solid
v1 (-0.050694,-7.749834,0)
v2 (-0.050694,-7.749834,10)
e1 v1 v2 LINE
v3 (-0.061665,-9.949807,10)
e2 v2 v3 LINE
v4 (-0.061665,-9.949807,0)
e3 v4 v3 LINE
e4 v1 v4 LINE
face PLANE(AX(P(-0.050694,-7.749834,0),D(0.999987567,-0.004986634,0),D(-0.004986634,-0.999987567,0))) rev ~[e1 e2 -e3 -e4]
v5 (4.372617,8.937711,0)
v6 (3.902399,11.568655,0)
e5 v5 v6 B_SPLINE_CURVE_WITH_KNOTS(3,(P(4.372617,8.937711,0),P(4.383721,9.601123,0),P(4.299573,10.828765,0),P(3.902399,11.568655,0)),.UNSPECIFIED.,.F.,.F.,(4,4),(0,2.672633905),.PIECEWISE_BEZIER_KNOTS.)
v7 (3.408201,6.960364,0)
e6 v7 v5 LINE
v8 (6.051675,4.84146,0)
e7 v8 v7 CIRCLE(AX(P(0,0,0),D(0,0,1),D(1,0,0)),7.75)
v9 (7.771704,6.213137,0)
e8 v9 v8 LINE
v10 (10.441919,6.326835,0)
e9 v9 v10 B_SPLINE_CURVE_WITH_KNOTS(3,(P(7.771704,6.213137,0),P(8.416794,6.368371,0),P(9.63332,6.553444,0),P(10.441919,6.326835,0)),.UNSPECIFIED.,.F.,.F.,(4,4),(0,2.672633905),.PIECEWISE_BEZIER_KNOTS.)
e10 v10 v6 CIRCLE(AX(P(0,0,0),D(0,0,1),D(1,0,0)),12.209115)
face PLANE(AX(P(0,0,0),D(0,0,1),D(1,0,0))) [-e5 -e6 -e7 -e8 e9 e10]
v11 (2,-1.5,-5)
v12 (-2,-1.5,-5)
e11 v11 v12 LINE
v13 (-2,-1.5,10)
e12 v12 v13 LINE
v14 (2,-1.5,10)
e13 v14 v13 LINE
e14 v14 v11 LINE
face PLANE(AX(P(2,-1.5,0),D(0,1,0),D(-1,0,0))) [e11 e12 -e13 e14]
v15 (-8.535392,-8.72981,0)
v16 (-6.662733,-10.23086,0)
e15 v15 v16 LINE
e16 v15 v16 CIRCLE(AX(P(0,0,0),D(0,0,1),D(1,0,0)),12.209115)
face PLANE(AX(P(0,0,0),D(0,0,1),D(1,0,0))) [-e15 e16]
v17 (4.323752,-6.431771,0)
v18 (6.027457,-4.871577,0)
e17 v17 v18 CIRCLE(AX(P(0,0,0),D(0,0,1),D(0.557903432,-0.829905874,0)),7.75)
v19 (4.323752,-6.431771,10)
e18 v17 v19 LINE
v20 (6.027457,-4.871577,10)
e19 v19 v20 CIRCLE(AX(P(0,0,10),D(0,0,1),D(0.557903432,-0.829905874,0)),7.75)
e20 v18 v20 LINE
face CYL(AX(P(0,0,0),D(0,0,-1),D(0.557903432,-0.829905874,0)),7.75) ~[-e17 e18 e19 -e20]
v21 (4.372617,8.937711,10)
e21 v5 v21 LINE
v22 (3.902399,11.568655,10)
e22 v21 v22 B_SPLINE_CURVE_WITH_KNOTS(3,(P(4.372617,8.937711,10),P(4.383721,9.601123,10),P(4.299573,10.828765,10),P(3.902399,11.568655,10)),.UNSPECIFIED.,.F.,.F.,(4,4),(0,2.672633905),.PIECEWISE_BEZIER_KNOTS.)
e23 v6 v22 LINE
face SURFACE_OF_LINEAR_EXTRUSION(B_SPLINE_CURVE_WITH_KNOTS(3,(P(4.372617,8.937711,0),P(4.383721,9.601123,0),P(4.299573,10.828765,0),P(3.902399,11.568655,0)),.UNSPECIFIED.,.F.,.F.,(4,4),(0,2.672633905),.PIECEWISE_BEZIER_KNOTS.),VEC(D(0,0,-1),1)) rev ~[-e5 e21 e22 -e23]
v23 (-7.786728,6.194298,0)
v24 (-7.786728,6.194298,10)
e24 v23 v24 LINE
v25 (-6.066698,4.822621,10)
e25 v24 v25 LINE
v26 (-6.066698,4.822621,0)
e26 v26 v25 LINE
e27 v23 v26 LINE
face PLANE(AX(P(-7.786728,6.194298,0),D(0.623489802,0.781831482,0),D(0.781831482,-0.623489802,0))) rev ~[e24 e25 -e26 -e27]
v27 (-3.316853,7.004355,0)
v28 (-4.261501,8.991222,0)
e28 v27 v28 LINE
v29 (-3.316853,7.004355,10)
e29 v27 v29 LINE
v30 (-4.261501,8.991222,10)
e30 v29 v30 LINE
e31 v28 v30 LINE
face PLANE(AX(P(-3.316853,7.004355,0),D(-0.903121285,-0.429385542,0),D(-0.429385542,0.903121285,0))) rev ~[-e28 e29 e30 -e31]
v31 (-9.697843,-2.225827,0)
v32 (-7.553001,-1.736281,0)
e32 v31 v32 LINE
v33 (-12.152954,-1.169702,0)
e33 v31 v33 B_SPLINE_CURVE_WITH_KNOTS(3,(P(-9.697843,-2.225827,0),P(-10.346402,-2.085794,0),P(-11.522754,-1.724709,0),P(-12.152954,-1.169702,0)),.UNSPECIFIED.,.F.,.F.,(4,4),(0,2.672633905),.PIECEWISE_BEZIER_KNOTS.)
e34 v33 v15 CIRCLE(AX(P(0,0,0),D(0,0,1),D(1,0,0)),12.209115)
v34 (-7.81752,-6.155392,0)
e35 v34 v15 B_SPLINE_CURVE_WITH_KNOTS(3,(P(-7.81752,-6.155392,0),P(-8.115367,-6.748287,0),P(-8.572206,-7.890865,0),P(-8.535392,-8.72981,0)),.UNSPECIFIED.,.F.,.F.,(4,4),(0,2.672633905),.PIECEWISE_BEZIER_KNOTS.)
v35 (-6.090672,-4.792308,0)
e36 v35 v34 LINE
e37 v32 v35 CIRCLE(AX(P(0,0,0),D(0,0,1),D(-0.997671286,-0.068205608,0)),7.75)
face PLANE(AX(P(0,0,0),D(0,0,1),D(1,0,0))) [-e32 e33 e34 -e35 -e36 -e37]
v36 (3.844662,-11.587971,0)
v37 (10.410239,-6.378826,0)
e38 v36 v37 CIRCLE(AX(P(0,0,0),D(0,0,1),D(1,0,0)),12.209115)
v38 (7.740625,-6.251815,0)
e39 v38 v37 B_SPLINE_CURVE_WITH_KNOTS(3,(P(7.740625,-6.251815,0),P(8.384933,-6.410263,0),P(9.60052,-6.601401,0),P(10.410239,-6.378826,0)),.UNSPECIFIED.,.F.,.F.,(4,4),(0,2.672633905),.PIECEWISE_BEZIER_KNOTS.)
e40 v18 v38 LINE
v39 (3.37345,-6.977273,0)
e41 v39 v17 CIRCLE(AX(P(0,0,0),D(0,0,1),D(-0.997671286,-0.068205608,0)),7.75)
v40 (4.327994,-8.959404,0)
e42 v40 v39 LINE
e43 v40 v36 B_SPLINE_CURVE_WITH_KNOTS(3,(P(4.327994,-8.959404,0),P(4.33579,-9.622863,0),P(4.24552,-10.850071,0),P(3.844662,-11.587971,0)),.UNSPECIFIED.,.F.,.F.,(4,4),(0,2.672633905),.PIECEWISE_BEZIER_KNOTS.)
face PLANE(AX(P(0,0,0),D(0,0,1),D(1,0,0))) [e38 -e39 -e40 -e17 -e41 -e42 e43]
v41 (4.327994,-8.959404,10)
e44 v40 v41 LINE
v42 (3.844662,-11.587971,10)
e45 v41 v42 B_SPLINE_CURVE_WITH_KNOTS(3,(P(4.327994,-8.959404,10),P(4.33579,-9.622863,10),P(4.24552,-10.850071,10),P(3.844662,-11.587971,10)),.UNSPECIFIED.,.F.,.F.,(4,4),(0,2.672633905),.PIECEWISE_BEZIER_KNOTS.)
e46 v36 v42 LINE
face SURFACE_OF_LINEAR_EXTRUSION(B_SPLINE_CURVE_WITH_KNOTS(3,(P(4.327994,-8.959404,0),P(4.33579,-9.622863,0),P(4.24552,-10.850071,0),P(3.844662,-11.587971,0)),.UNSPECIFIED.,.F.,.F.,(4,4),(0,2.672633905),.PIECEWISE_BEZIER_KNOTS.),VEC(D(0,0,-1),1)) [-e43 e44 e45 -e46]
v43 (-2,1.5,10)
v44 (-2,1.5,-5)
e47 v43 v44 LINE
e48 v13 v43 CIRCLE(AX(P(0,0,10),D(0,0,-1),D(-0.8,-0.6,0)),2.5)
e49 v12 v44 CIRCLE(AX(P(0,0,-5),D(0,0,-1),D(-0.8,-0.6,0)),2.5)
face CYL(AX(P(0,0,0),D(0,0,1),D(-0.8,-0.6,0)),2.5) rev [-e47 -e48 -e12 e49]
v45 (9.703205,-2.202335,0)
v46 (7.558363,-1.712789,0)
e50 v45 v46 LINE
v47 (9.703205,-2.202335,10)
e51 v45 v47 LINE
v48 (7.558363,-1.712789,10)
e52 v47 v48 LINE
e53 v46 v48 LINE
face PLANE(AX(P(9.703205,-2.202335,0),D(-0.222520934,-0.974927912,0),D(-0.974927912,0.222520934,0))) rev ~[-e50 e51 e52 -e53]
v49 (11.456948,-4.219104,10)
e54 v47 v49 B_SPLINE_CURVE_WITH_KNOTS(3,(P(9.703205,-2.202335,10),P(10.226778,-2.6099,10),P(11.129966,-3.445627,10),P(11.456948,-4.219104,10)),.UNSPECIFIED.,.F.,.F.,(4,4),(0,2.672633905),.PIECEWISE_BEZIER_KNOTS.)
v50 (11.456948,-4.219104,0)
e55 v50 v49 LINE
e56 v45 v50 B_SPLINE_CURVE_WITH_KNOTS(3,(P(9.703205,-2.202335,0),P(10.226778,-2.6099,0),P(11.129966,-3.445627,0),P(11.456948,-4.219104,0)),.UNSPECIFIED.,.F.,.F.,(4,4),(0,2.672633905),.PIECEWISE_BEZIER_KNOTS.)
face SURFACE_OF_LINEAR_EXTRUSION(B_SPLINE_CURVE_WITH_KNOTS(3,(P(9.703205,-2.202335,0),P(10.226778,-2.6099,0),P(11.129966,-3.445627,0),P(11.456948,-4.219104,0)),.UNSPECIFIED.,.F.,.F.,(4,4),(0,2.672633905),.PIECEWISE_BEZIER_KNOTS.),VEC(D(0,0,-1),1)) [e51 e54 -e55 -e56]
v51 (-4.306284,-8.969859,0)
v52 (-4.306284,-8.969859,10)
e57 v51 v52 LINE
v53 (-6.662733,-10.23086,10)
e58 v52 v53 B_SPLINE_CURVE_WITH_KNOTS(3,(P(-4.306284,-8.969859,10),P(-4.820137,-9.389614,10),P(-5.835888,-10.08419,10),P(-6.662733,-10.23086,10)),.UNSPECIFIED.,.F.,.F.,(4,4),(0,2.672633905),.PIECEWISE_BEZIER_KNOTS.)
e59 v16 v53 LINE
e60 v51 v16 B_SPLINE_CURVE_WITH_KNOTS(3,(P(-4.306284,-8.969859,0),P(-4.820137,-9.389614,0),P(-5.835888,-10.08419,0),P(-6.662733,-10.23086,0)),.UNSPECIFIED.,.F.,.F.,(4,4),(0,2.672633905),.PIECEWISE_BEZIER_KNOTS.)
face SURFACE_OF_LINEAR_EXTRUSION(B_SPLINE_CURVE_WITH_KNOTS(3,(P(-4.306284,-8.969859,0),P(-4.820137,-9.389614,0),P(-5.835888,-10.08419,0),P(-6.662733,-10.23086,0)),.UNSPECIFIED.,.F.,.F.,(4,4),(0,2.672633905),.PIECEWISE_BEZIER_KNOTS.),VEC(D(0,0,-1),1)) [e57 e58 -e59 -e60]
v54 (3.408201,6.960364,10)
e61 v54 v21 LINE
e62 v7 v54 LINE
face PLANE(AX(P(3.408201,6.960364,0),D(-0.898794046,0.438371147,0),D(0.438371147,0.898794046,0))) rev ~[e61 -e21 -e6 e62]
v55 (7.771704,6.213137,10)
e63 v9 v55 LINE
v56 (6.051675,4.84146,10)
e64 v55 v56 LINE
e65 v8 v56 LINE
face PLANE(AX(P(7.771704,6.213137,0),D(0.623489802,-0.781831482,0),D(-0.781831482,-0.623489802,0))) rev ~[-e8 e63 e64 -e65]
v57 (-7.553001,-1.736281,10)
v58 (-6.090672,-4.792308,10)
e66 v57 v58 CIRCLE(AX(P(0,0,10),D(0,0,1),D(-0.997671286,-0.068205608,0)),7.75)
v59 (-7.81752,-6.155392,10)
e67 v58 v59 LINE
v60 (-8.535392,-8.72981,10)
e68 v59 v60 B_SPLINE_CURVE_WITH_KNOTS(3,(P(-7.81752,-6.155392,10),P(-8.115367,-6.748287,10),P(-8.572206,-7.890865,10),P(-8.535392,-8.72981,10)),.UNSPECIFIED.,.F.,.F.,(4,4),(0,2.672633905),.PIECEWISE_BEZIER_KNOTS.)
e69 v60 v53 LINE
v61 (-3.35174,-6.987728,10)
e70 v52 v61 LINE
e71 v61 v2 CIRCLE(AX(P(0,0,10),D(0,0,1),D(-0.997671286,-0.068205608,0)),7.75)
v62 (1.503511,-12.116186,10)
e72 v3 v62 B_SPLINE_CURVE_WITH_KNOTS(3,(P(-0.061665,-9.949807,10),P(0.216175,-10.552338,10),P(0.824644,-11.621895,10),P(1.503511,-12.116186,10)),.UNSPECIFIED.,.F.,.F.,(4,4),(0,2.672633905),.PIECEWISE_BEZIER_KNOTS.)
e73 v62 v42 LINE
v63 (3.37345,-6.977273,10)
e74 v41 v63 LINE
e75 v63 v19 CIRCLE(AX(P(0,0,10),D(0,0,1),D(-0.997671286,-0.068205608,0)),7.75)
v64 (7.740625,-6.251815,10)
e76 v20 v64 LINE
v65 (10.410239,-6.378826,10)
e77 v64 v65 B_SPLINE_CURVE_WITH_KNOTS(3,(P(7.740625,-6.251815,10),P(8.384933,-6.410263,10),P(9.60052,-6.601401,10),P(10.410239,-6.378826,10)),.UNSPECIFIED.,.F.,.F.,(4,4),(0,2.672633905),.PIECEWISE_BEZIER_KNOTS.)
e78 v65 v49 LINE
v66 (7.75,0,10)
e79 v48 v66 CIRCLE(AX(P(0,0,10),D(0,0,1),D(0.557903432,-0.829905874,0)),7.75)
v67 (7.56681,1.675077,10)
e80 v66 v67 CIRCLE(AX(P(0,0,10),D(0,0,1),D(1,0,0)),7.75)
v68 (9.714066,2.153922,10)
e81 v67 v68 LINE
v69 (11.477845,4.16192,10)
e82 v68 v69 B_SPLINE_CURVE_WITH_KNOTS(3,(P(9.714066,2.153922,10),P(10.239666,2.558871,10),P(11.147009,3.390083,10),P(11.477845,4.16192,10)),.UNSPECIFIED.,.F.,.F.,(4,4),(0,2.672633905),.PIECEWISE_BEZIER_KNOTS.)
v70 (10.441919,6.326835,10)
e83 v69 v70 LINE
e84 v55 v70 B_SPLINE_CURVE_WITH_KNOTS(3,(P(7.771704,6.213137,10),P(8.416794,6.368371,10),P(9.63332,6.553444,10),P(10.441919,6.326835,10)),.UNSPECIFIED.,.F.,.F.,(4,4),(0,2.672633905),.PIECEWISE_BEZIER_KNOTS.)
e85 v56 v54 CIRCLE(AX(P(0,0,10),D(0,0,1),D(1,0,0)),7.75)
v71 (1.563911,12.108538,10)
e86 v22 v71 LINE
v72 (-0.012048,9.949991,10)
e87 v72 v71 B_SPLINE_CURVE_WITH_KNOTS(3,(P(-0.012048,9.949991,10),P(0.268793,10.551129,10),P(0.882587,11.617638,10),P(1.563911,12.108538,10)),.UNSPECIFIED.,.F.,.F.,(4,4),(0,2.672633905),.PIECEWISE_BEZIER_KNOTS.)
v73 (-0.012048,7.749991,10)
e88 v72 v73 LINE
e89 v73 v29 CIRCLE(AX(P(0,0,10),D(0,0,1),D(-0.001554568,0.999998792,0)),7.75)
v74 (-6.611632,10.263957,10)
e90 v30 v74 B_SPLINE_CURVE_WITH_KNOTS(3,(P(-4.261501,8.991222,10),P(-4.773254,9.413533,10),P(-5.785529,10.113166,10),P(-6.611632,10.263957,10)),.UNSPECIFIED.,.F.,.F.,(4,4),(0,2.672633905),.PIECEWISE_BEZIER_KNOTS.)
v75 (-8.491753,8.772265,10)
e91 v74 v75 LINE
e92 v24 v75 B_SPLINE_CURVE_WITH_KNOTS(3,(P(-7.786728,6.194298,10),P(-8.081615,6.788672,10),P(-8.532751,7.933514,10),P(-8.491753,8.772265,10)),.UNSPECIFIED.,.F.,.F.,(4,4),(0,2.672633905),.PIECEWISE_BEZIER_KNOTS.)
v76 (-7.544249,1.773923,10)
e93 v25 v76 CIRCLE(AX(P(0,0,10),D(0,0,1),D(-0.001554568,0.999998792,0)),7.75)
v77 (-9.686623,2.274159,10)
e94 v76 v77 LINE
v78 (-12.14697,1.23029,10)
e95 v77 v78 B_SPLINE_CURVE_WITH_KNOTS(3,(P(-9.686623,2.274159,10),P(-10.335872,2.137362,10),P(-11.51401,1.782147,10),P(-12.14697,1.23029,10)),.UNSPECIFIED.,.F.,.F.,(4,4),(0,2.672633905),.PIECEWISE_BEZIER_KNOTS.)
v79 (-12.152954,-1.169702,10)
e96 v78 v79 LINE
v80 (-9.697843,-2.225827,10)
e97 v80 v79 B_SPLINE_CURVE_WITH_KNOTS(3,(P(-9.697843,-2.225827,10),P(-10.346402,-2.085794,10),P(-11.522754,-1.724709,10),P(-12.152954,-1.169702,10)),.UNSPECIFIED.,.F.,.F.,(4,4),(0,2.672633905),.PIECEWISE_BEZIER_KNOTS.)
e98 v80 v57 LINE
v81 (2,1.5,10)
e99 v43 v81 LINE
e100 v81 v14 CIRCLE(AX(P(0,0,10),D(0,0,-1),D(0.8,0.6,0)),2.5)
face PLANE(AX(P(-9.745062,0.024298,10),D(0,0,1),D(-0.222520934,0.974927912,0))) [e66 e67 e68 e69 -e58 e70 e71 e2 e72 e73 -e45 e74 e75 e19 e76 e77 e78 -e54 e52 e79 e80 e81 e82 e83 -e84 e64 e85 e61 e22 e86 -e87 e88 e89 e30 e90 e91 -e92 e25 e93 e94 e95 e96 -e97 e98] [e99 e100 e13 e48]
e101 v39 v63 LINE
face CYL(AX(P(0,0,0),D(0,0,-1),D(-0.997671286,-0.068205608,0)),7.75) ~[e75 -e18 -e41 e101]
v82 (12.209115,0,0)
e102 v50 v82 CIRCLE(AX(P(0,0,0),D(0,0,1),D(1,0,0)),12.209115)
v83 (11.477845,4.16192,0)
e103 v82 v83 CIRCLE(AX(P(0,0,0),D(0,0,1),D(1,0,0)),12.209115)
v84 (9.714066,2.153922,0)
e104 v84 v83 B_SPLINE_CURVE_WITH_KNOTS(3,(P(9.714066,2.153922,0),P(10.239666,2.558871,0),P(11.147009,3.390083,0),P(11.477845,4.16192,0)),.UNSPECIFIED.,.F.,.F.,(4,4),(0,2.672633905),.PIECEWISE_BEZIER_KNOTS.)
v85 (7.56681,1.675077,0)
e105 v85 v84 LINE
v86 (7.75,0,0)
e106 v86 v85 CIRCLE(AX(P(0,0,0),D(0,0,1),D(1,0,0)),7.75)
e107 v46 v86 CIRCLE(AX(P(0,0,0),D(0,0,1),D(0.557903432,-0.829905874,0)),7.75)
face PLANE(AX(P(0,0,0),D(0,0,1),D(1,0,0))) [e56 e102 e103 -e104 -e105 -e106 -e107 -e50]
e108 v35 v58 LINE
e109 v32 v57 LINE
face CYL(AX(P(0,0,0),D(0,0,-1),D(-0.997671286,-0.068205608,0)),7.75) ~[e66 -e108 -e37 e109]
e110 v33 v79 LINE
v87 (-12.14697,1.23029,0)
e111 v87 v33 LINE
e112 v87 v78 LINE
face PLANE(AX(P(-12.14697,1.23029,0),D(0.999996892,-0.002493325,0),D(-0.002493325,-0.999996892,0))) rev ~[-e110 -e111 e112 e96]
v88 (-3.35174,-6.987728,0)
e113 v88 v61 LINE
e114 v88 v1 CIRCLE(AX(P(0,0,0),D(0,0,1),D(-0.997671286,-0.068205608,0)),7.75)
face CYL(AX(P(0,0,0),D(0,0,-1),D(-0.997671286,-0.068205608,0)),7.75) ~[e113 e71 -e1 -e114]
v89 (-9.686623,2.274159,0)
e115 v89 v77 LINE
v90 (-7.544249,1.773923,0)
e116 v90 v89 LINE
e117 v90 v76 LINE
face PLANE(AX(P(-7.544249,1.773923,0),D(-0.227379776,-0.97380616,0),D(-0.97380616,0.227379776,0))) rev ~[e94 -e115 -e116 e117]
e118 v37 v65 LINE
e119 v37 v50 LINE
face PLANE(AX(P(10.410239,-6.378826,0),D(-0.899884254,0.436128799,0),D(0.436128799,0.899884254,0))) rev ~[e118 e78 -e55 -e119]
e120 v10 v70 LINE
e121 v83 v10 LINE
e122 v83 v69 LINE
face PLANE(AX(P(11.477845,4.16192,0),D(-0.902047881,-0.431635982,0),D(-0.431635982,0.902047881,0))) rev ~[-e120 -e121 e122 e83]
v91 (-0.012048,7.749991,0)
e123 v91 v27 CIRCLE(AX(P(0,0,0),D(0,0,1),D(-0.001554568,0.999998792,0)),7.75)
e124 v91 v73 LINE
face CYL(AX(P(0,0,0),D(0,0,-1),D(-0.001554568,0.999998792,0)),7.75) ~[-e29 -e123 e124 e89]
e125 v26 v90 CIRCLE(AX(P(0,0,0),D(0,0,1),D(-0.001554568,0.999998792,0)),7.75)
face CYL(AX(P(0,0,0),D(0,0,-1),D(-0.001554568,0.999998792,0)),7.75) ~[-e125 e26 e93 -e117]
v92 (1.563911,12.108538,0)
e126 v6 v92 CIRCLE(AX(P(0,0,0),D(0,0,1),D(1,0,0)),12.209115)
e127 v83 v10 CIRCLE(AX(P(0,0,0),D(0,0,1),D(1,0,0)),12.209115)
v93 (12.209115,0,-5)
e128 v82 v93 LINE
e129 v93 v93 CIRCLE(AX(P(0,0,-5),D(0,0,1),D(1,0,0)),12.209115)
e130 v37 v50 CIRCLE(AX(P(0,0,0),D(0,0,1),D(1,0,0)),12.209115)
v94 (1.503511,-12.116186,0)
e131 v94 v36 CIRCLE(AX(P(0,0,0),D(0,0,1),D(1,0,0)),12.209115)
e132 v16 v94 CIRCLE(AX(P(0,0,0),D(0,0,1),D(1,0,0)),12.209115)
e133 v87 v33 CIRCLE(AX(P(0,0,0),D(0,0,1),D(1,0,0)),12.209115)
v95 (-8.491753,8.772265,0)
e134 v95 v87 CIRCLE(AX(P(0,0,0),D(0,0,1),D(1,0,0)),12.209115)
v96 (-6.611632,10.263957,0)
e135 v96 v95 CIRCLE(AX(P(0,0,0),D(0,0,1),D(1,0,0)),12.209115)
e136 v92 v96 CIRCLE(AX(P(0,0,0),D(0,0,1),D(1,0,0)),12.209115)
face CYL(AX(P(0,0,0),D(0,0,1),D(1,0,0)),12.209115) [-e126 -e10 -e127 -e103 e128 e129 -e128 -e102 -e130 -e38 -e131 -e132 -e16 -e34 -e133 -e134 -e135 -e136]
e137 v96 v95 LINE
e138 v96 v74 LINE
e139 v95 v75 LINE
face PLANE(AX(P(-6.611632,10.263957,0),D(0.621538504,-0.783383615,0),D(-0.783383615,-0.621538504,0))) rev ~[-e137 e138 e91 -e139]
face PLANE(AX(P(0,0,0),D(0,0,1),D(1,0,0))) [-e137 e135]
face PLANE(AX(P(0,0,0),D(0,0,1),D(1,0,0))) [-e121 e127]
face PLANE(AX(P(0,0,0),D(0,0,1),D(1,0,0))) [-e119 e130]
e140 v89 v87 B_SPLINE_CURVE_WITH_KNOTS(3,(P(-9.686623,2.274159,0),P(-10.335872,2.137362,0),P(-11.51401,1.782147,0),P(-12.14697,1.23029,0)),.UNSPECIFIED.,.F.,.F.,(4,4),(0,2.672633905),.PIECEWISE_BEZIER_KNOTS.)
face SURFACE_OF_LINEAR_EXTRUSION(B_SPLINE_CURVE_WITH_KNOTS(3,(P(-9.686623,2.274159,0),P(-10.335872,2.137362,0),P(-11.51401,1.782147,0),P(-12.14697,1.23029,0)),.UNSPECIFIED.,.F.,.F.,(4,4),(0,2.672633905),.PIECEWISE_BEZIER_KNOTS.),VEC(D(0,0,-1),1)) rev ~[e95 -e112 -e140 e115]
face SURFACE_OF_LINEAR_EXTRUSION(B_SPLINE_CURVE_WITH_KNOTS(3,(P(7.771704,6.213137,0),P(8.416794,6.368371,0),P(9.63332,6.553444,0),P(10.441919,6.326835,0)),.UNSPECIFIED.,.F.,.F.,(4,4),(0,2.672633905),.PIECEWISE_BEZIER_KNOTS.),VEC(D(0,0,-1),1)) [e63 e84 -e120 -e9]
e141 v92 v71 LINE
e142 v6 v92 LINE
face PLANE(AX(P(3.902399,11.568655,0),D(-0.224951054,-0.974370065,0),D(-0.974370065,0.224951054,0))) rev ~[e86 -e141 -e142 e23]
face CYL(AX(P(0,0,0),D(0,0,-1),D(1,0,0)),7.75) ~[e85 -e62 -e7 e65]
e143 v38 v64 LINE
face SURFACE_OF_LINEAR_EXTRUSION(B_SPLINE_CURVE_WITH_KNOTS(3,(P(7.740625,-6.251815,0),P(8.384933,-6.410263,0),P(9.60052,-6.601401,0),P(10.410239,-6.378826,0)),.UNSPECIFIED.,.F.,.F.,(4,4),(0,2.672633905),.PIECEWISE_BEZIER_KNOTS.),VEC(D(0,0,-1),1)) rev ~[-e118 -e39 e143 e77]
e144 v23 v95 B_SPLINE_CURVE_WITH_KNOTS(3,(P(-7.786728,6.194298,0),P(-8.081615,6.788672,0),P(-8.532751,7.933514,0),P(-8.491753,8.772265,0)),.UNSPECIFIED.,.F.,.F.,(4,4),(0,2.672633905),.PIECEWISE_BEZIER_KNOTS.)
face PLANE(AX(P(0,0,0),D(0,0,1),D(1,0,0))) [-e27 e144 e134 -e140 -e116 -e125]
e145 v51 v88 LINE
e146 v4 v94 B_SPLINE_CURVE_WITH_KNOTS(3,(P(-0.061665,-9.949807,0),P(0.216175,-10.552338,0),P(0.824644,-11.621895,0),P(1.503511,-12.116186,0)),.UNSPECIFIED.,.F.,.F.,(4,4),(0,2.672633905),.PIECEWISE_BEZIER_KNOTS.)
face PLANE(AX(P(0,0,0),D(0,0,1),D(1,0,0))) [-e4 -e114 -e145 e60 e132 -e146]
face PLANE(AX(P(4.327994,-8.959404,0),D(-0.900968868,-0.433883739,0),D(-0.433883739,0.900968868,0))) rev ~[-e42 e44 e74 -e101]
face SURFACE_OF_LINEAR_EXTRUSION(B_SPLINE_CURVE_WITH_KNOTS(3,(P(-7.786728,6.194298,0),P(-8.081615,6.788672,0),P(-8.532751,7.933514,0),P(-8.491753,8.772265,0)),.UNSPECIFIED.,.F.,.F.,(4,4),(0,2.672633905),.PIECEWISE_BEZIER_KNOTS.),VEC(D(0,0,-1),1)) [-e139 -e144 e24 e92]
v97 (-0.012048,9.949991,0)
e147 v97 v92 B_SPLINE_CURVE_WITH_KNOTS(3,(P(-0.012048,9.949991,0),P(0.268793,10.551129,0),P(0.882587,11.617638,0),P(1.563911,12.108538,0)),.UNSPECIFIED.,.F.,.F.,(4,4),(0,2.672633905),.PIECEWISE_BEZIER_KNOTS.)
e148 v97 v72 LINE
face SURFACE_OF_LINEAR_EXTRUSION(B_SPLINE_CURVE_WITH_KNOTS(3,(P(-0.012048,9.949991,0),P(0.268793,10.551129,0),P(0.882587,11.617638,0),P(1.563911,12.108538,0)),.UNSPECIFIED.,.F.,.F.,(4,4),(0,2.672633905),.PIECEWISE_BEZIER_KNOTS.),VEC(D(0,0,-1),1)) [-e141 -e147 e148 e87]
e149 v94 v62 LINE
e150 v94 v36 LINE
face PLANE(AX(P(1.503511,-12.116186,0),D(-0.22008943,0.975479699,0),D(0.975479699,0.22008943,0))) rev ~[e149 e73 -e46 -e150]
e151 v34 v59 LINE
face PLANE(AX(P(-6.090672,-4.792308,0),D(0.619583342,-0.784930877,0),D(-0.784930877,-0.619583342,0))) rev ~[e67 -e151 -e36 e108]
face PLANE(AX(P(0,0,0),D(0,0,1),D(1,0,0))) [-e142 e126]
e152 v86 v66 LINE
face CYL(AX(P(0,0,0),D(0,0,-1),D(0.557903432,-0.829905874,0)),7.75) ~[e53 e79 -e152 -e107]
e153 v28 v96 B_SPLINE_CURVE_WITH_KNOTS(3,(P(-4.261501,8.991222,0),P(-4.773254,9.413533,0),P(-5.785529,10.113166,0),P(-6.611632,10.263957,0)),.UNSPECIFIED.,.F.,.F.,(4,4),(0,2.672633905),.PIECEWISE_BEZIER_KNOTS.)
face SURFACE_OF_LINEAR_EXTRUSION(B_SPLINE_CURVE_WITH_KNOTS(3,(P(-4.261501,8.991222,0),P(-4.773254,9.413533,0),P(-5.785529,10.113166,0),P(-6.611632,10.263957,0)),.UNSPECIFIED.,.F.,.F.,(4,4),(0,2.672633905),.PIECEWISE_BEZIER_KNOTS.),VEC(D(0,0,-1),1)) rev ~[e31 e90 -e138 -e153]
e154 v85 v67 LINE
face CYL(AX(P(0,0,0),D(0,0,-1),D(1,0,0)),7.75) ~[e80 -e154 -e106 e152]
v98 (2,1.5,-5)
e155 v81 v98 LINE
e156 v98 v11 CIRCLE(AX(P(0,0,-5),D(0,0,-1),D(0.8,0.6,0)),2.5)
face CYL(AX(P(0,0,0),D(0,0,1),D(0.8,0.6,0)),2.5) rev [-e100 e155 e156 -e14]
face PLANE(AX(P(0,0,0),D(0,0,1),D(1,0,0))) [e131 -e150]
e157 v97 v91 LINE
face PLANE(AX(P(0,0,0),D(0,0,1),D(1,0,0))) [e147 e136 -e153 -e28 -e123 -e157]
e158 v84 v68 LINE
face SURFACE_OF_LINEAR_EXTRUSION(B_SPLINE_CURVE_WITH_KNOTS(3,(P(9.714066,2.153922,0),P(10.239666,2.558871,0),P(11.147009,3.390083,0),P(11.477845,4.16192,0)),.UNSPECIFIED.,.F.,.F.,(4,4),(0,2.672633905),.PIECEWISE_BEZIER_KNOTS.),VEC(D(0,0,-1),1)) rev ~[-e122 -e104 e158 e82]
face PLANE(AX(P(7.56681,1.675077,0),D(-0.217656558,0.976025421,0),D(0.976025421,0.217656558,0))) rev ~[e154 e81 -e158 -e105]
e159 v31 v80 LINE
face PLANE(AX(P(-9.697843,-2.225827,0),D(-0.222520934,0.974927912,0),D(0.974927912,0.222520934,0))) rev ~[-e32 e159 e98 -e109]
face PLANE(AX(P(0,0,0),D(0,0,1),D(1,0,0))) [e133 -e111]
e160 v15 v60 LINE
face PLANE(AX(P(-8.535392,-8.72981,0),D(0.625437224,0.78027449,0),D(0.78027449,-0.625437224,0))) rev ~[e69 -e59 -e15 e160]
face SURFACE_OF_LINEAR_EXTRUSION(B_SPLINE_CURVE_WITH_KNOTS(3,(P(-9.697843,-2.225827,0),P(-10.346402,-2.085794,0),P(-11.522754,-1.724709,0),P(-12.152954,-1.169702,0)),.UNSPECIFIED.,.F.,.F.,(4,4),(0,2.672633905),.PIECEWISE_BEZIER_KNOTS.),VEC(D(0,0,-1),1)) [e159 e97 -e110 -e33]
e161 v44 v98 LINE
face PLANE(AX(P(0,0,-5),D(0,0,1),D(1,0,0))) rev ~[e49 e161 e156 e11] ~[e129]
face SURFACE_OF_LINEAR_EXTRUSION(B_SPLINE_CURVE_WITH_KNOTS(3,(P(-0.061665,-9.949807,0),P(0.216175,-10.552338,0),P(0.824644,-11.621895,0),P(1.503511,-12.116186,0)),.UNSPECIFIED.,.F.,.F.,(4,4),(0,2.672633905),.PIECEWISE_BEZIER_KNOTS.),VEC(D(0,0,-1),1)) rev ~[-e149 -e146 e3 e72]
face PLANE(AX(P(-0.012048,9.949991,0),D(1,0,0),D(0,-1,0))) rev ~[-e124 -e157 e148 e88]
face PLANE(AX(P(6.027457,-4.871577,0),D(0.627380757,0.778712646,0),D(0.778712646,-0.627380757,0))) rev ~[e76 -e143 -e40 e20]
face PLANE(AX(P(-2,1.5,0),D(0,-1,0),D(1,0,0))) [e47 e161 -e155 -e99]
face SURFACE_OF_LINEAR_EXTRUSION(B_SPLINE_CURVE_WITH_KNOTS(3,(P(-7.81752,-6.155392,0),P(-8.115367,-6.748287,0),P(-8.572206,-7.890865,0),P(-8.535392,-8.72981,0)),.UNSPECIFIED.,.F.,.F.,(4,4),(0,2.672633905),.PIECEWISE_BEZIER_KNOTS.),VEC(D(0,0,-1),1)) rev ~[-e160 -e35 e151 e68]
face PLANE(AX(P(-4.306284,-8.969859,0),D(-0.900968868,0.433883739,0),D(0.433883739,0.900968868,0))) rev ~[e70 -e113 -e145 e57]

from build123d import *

# Parameters (mm, degrees)
F1_DEPTH        = 10
F2_DEPTH        = 10
F2_COPIES_COUNT = 7
F4_R            = 12.2091154471
F5_DEPTH        = 5


# Not quite as in the source:
# - a pattern or mirror of a feature is missing from the dataset's text; its kind, count and spacing are read off the source's solid


with BuildPart() as f1:
    # F0 (on Top) → F1 (new body)
    with BuildSketch(Plane.XY):
        with BuildLine():
            ThreePointArc((4.3237516011, -6.4317705254), (6.8400137028, -3.6437223475), (7.75, 0))
            ThreePointArc((7.75, 0), (6.5755629687, 4.1017644551), (3.4082008658, 6.9603639889))
            ThreePointArc((3.4082008658, 6.9603639889), (1.7433706712, 7.5513680021), (-0.0120479028, 7.7499906354))
            ThreePointArc((-0.0120479028, 7.7499906354), (-5.6679911875, 5.2854872905), (-7.7319524669, -0.5285934635))
            ThreePointArc((-7.7319524669, -0.5285934635), (-3.4082008658, -6.9603639889), (4.3237516011, -6.4317705254))
        make_face()
        with BuildLine():
            ThreePointArc((-2, -1.5), (-2.5, 0), (-2, 1.5))
            Line((-2, 1.5), (2, 1.5))
            ThreePointArc((2, 1.5), (2.5, 0), (2, -1.5))
            Line((2, -1.5), (-2, -1.5))
        make_face(mode=Mode.SUBTRACT)
    extrude(amount=F1_DEPTH)

    # F0 (on Top) → F2 (join)
    with BuildSketch(Plane.XY):
        with BuildLine():
            ThreePointArc((-0.0120479028, 7.7499906354), (1.7433706712, 7.5513680021), (3.4082008658, 6.9603639889))
            Line((3.4082008658, 6.9603639889), (4.3726173887, 8.9377108908))
            add(Edge.make_bspline(
                [(4.3726173887, 8.9377108908), (4.3837213667, 9.6011226956), (4.2995730436, 10.8287649694), (3.902399388, 11.5686550219)],
                knots=[0, 0, 0, 0, 2.6726339048, 2.6726339048, 2.6726339048, 2.6726339048], degree=3))
            Line((3.902399388, 11.5686550219), (1.5639112325, 12.1085375524))
            add(Edge.make_bspline(
                [(-0.0120479028, 9.9499906354), (0.2687925016, 10.5511288793), (0.8825874647, 11.6176382491), (1.5639112325, 12.1085375524)],
                knots=[0, 0, 0, 0, 2.6726339048, 2.6726339048, 2.6726339048, 2.6726339048], degree=3))
            Line((-0.0120479028, 9.9499906354), (-0.0120479028, 7.7499906354))
        make_face()
    f2 = extrude(amount=F2_DEPTH)

    # F2_copies: F2 ×7 about axis
    f2_copies_axis = Axis((0, 0, 0), (0, 0, 1))
    for i in range(1, F2_COPIES_COUNT):
        add(f2.rotate(f2_copies_axis, i * 360 / F2_COPIES_COUNT))

    # F4 (on face) + F0 (on Top) → F5 (join)
    with BuildSketch(Plane.XY):
        Circle(F4_R)
        with BuildLine():
            ThreePointArc((7.75, 0), (6.8400137028, -3.6437223475), (4.3237516011, -6.4317705254))
            ThreePointArc((4.3237516011, -6.4317705254), (-3.4082008658, -6.9603639889), (-7.7319524669, -0.5285934635))
            ThreePointArc((-7.7319524669, -0.5285934635), (-5.6679911875, 5.2854872905), (-0.0120479028, 7.7499906354))
            ThreePointArc((-0.0120479028, 7.7499906354), (1.7433706712, 7.5513680021), (3.4082008658, 6.9603639889))
            ThreePointArc((3.4082008658, 6.9603639889), (6.5755629687, 4.1017644551), (7.75, 0))
        make_face(mode=Mode.SUBTRACT)
    with BuildSketch(Plane.XY):
        with BuildLine():
            ThreePointArc((4.3237516011, -6.4317705254), (6.8400137028, -3.6437223475), (7.75, 0))
            ThreePointArc((7.75, 0), (6.5755629687, 4.1017644551), (3.4082008658, 6.9603639889))
            ThreePointArc((3.4082008658, 6.9603639889), (1.7433706712, 7.5513680021), (-0.0120479028, 7.7499906354))
            ThreePointArc((-0.0120479028, 7.7499906354), (-5.6679911875, 5.2854872905), (-7.7319524669, -0.5285934635))
            ThreePointArc((-7.7319524669, -0.5285934635), (-3.4082008658, -6.9603639889), (4.3237516011, -6.4317705254))
        make_face()
        with BuildLine():
            ThreePointArc((-2, -1.5), (-2.5, 0), (-2, 1.5))
            Line((-2, 1.5), (2, 1.5))
            ThreePointArc((2, 1.5), (2.5, 0), (2, -1.5))
            Line((2, -1.5), (-2, -1.5))
        make_face(mode=Mode.SUBTRACT)
    extrude(amount=-F5_DEPTH)


solid = f1.part
